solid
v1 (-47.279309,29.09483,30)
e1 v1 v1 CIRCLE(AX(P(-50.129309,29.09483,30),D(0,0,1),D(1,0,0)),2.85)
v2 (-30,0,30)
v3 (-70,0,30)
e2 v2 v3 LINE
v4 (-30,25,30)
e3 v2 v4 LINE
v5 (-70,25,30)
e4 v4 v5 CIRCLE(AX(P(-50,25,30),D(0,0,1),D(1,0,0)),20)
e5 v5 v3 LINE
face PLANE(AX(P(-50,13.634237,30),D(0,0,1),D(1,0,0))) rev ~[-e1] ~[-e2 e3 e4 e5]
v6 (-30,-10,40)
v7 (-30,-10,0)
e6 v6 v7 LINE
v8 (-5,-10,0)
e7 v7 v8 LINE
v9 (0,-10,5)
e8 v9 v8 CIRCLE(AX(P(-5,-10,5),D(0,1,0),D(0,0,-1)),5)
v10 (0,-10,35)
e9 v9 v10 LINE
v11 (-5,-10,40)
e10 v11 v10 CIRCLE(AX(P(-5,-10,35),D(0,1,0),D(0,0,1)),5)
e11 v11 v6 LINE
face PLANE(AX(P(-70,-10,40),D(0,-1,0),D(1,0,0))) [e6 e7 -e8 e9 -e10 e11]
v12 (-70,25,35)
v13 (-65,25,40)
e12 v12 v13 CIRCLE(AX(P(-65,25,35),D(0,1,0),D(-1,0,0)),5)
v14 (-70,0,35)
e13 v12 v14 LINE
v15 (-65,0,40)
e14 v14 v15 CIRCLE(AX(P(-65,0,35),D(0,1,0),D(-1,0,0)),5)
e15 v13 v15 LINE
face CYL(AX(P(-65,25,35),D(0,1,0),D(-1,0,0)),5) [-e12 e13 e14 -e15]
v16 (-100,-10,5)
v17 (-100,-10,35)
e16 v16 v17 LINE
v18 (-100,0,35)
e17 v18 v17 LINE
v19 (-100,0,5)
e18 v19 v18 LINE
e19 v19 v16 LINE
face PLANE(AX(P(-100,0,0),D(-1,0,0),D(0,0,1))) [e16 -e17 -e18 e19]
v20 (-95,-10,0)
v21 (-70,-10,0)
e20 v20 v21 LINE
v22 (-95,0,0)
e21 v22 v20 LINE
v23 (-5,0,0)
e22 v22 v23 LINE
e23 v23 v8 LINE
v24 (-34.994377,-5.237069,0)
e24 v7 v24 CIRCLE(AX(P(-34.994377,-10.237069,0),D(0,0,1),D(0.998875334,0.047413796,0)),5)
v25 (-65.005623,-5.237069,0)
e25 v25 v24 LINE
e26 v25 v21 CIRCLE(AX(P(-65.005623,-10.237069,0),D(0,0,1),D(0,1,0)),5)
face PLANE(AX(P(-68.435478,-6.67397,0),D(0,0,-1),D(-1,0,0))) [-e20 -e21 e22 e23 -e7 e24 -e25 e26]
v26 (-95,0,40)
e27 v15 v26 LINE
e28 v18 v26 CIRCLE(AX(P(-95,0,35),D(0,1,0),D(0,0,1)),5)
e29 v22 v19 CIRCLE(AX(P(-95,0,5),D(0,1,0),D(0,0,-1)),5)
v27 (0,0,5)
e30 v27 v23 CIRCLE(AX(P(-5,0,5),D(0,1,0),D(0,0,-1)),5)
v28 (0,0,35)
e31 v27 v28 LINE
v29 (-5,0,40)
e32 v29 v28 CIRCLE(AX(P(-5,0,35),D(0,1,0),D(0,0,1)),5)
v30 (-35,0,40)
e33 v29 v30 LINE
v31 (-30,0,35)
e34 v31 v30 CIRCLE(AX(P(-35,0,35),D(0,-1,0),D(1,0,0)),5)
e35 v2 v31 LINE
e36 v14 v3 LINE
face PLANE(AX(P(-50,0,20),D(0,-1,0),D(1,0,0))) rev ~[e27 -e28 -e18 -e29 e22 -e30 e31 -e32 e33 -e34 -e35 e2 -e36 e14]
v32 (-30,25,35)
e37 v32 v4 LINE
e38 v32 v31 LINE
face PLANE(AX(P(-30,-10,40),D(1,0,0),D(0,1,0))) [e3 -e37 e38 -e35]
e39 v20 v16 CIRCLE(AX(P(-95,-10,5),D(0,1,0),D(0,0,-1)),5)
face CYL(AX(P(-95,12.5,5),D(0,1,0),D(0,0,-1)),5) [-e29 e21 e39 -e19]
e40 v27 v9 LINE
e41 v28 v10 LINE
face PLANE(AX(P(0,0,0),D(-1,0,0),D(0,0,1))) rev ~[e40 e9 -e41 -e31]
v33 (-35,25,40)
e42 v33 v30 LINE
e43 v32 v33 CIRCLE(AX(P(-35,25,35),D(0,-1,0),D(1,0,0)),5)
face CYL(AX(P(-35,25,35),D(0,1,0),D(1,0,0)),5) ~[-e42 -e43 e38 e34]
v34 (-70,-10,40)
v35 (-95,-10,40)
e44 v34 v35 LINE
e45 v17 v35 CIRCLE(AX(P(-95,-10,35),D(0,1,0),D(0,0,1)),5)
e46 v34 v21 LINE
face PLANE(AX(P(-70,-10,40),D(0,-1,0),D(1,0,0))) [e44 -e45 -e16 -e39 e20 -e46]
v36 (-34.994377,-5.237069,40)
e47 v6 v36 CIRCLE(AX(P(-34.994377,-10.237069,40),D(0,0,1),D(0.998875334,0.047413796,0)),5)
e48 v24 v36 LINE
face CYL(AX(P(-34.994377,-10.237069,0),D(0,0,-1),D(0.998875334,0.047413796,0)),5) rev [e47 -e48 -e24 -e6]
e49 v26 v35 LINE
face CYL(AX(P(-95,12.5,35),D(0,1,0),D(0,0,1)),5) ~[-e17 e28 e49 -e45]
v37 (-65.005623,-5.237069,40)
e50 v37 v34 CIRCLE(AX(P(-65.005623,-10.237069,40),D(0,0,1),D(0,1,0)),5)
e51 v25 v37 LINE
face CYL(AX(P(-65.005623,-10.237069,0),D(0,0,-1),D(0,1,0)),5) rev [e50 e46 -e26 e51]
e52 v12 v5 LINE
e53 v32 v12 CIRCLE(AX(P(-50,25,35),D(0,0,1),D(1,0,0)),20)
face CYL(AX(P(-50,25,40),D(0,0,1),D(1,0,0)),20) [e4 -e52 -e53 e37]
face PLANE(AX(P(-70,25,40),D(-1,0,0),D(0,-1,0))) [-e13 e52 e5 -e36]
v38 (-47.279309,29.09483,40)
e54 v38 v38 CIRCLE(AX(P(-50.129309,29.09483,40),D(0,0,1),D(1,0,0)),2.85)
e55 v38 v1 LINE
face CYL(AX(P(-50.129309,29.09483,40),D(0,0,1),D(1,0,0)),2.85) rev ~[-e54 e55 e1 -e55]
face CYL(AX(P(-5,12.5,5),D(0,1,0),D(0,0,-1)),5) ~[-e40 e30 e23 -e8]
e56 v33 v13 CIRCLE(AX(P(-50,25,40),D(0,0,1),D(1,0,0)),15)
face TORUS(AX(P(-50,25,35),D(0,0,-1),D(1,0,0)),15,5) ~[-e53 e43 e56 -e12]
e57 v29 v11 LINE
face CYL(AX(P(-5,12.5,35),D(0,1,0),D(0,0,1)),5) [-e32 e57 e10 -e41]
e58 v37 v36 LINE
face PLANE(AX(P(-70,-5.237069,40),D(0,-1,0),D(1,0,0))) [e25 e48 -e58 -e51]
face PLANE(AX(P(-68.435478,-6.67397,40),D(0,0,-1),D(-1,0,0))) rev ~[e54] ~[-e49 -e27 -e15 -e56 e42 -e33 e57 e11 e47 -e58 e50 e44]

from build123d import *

# Parameters (mm, degrees)
F0_W          = 100
F0_H          = 40
F1_DEPTH      = 10
F3_DEPTH      = 10
F4_W          = 40
F4_H          = 3
F5_DEPTH      = 174
F6_W          = 40
F6_H          = 4.7629310191
F7_DEPTH      = 40.001
F8_R          = 2.85
F9_DEPTH      = 40.001
F10_T1_DEPTH  = 40
F10_T3_DEPTH  = 40
F10_T5_DEPTH  = 35
F10_T7_DEPTH  = 35
F10_T9_DEPTH  = 35
F10_T11_DEPTH = 35
F10_T13_DEPTH = 25
F10_T16_ANGLE = 180


# Not quite as in the source:
# - a fillet or chamfer that OpenCascade refuses, or shapes differently, is made with other operations: its cross-section is extruded or revolved along the edge and cut away or added
# - two fillets or chamfers of one size are made in one step
# - an extrude ends at something that could not be found from the text; its depth is read off the source's solid


with BuildPart() as f1:
    # F0 (on Front) → F1 (new body)
    with BuildSketch(Plane.XZ):
        with Locations((-50, 20)):
            Rectangle(F0_W, F0_H)
    extrude(amount=F1_DEPTH)

    # F2 (on face) → F3 (join)
    with BuildSketch(Plane.XY.offset(40)):
        with BuildLine():
            Line((-70, 25), (-70, 0))
            Line((-70, 0), (-70, -10))
            Line((-70, -10), (-30, -10))
            Line((-30, -10), (-30, 0))
            Line((-30, 0), (-30, 25))
            ThreePointArc((-30, 25), (-50, 45), (-70, 25))
        make_face()
        with BuildLine():
            Line((-70, 25), (-70, 0))
            Line((-70, 0), (-30, 0))
            Line((-30, 0), (-30, 25))
            ThreePointArc((-30, 25), (-50, 45), (-70, 25))
        make_face()
    extrude(amount=-F3_DEPTH)

    # F4 (on face) → F5 (cut, through all)
    with BuildSketch(Plane.XY.offset(40)):
        with Locations((-50, -8.5)):
            Rectangle(F4_W, F4_H)
    extrude(amount=F5_DEPTH, mode=Mode.SUBTRACT)

    # F6 (on face) → F7 (cut, through all)
    with BuildSketch(Plane.XY.offset(40)):
        with Locations((-50, -7.6185344905)):
            Rectangle(F6_W, F6_H)
    extrude(amount=-F7_DEPTH, mode=Mode.SUBTRACT)

    # F8 (on face) → F9 (cut, through all)
    with BuildSketch(Plane.XY.offset(40)):
        with Locations((-50.1293092966, 29.0948301554)):
            Circle(F8_R)
    extrude(amount=-F9_DEPTH, mode=Mode.SUBTRACT)

    # F10: fillet of radius 5 on 9 edges, made by hand

    # F10_s2 → F10_t1 (join)
    with BuildSketch(Plane.XY):
        with BuildLine():
            ThreePointArc((-30, -10), (-31.543677094, -6.6186891705), (-34.9943766676, -5.2370689809))
            Line((-34.9943766676, -5.2370689809), (-30, -5.2370689809))
            Line((-30, -5.2370689809), (-30, -10))
        make_face()
    extrude(amount=F10_T1_DEPTH)

    # F10_s4 → F10_t3 (join)
    with BuildSketch(Plane.XY):
        with BuildLine():
            ThreePointArc((-65.0056233324, -5.2370689809), (-68.456322906, -6.6186891705), (-70, -10))
            Line((-70, -10), (-70, -5.2370689809))
            Line((-70, -5.2370689809), (-65.0056233324, -5.2370689809))
        make_face()
    extrude(amount=F10_T3_DEPTH)

    # F10_s6 → F10_t5 (cut)
    with BuildSketch(Plane.XZ.offset(-12.5)):
        with BuildLine():
            ThreePointArc((-5, 0), (-1.4644660941, 1.4644660941), (0, 5))
            Line((0, 5), (0, 0))
            Line((0, 0), (-5, 0))
        make_face()
    extrude(amount=F10_T5_DEPTH, mode=Mode.SUBTRACT)

    # F10_s8 → F10_t7 (cut)
    with BuildSketch(Plane.XZ.offset(-12.5)):
        with BuildLine():
            ThreePointArc((-95, 0), (-98.5355339059, 1.4644660941), (-100, 5))
            Line((-100, 5), (-100, 0))
            Line((-100, 0), (-95, 0))
        make_face()
    extrude(amount=F10_T7_DEPTH, mode=Mode.SUBTRACT)

    # F10_s10 → F10_t9 (cut)
    with BuildSketch(Plane.XZ.offset(-12.5)):
        with BuildLine():
            ThreePointArc((-5, 40), (-1.4644660941, 38.5355339059), (0, 35))
            Line((0, 35), (0, 40))
            Line((0, 40), (-5, 40))
        make_face()
    extrude(amount=F10_T9_DEPTH, mode=Mode.SUBTRACT)

    # F10_s12 → F10_t11 (cut)
    with BuildSketch(Plane.XZ.offset(-12.5)):
        with BuildLine():
            ThreePointArc((-95, 40), (-98.5355339059, 38.5355339059), (-100, 35))
            Line((-100, 35), (-100, 40))
            Line((-100, 40), (-95, 40))
        make_face()
    extrude(amount=F10_T11_DEPTH, mode=Mode.SUBTRACT)

    # F10_s14 → F10_t13 (cut)
    with BuildSketch(Plane.XZ.offset(-25)):
        with BuildLine():
            ThreePointArc((-70, 35), (-68.5355339059, 38.5355339059), (-65, 40))
            Line((-65, 40), (-70, 40))
            Line((-70, 40), (-70, 35))
        make_face()
        with BuildLine():
            ThreePointArc((-30, 35), (-31.4644660941, 38.5355339059), (-35, 40))
            Line((-35, 40), (-30, 40))
            Line((-30, 40), (-30, 35))
        make_face()
    extrude(amount=F10_T13_DEPTH, mode=Mode.SUBTRACT)

    # F10_s15 → F10_t16 (revolve, cut)
    with BuildSketch(Plane.XZ.offset(-25)):
        with BuildLine():
            ThreePointArc((-35, 40), (-31.4644660941, 38.5355339059), (-30, 35))
            Line((-30, 35), (-30, 40))
            Line((-30, 40), (-35, 40))
        make_face()
    revolve(axis=Axis((-50, 25, 40), (0, 0, 1)), revolution_arc=F10_T16_ANGLE, mode=Mode.SUBTRACT)


solid = f1.part
